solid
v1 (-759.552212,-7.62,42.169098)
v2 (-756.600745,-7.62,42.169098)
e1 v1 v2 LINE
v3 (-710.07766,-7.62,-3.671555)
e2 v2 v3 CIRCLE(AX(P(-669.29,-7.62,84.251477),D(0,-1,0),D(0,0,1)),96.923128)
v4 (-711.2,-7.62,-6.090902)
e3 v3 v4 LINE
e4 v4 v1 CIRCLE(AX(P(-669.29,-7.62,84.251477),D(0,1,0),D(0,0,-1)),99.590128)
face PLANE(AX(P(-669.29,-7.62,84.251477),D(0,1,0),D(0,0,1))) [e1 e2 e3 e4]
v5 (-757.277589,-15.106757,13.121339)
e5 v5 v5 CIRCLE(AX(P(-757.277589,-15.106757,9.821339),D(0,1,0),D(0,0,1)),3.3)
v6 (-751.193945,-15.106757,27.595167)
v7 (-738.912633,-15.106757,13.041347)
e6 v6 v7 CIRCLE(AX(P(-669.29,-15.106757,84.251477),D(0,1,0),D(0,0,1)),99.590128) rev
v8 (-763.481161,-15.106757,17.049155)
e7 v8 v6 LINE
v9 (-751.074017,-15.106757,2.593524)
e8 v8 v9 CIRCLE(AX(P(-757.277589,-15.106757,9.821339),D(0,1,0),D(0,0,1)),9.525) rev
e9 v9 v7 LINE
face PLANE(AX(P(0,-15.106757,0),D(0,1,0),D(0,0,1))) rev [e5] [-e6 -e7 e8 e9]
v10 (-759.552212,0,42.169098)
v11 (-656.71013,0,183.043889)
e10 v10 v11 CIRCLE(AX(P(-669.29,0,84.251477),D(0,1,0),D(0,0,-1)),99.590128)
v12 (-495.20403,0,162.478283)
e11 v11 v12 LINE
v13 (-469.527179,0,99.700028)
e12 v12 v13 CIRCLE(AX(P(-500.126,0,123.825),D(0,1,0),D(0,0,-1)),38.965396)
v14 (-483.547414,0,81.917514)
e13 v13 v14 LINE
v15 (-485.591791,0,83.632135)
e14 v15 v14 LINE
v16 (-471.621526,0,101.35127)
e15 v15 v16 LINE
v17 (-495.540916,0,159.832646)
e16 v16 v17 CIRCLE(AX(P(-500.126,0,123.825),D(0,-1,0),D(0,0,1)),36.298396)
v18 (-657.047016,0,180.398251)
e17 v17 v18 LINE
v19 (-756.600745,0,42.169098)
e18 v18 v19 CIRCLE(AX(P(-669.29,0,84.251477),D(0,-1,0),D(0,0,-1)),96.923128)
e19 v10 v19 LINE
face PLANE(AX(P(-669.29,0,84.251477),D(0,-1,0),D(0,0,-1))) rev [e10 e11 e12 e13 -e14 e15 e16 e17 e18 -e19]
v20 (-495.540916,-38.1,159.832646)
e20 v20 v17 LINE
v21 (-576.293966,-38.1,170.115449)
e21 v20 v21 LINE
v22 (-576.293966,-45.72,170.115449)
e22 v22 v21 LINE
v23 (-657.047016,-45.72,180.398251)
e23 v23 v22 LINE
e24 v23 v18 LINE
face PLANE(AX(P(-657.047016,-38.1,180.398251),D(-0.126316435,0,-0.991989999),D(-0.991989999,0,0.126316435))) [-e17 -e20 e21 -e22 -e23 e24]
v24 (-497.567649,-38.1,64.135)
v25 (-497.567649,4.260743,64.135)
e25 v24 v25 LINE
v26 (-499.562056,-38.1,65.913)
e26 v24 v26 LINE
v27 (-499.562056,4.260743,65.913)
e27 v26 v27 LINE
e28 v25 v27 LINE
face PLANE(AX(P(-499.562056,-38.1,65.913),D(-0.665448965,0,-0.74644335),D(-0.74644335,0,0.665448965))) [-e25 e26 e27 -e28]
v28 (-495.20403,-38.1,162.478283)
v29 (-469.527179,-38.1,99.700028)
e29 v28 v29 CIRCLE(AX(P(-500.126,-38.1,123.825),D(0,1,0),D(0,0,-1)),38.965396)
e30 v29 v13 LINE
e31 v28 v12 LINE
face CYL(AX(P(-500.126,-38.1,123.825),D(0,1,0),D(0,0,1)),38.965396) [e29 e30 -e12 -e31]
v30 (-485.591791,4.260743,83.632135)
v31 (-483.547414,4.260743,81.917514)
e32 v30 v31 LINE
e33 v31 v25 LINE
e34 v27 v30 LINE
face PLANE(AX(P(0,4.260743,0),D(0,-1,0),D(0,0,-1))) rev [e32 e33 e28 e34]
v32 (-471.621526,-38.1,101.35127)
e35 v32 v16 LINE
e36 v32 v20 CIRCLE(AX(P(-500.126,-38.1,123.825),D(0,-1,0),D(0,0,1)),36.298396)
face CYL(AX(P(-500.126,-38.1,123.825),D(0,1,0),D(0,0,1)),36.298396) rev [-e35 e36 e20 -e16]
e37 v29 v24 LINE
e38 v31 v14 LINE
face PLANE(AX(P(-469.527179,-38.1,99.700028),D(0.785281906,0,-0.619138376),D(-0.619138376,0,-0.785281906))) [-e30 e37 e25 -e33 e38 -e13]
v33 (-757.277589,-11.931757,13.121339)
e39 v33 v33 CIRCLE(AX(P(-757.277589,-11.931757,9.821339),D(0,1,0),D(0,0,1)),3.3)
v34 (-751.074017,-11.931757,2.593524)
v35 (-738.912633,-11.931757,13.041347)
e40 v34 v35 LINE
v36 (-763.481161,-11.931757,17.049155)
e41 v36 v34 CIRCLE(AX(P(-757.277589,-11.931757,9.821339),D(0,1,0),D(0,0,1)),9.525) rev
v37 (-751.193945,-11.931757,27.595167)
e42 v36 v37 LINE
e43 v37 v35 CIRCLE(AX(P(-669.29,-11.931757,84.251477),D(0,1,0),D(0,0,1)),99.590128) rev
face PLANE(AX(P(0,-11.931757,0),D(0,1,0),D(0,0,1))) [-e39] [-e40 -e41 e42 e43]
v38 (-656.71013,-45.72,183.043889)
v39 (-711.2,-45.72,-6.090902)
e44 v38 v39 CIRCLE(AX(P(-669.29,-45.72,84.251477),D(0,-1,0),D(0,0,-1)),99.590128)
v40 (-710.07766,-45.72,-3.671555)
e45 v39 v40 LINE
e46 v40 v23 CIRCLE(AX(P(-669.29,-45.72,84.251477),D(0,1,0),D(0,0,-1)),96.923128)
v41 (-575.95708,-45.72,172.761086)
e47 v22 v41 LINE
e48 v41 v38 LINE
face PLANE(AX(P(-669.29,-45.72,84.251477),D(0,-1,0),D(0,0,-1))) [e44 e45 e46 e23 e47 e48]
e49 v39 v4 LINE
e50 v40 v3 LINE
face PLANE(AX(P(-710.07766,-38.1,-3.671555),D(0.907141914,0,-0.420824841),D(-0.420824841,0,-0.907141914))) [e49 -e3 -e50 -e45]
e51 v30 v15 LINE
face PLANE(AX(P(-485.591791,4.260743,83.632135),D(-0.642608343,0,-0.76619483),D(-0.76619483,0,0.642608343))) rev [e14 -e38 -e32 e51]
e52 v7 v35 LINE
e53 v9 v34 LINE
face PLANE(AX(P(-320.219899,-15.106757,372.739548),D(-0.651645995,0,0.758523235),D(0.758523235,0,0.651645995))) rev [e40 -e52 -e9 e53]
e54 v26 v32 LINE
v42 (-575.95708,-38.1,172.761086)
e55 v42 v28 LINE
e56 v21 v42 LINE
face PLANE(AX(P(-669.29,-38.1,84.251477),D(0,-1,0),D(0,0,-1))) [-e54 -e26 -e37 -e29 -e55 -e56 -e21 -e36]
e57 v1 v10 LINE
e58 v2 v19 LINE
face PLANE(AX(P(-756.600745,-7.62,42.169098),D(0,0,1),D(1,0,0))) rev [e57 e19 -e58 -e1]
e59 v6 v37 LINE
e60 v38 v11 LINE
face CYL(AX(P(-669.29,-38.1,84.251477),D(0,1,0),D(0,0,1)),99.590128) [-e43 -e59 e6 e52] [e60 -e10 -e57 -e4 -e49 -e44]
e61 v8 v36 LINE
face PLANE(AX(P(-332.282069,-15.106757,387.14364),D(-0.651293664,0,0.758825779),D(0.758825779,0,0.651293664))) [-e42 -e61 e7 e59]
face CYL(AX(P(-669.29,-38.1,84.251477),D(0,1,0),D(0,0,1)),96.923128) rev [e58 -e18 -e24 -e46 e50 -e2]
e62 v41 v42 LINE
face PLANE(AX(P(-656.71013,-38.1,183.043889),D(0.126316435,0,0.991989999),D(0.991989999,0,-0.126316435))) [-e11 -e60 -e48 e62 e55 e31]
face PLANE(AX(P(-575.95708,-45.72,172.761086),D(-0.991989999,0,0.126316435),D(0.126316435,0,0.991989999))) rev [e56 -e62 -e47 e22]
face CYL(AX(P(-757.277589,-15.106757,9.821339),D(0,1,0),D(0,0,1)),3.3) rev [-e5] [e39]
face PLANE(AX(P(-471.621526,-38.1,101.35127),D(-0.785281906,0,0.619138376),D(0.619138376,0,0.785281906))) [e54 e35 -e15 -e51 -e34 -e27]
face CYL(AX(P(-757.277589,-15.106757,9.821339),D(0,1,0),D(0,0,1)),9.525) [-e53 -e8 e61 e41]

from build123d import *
from build123d.topology import SkipClean

# Parameters (mm, degrees)
BASE_FLANGE1_DEPTH  = 38.1
CUT_EXTRUDE1_DEPTH  = 7.62
SKETCH9_R           = 3.3
BOSS_EXTRUDE1_DEPTH = 3.175
BOSS_EXTRUDE2_DEPTH = 7.62
BOSS_EXTRUDE4_DEPTH = 4.26074332


# Sheet-metal steps are written as plain solids
with BuildPart() as part:
    # Sketch1 → Base-Flange1 (new body)
    with BuildSketch(Plane(origin=(0, 0, 0), x_dir=(1, 0, 0), z_dir=(0, 1, 0))):
        with BuildLine():
            Line((-657.047015903, -180.398251424), (-495.540915967, -159.83264605))
            ThreePointArc((-495.540915967, -159.83264605), (-466.529161595, -137.56639807), (-471.621526187, -101.351269827))
            Line((-471.621526187, -101.351269827), (-499.562056453, -65.912999952))
            Line((-499.562056453, -65.912999952), (-497.56764915, -64.134999952))
            Line((-497.56764915, -64.134999952), (-469.527179345, -99.700027778))
            ThreePointArc((-469.527179345, -99.700027778), (-464.060656724, -138.576037958), (-495.204030033, -162.478283377))
            Line((-495.204030033, -162.478283377), (-656.710129969, -183.043888751))
            ThreePointArc((-656.710129969, -183.043888751), (-764.987734735, -111.822063922), (-711.2, 6.090902363))
            Line((-711.2, 6.090902363), (-710.077660148, 3.671554877))
            ThreePointArc((-710.077660148, 3.671554877), (-762.424972114, -111.083730158), (-657.047015903, -180.398251424))
        make_face()
    extrude(amount=-BASE_FLANGE1_DEPTH)

    # Sketch7 → Cut-Extrude1 (cut)
    with BuildSketch(Plane(origin=(-711.2, 0, -6.090902363), x_dir=(1, 0, 0), z_dir=(0, 1, 0))):
        with BuildLine():
            Line((1.122339852, -2.419347486), (0, 0))
            ThreePointArc((0, 0), (-28.443609249, -19.854342865), (-48.352212426, -48.26))
            Line((-48.352212426, -48.26), (-45.400744677, -48.26))
            ThreePointArc((-45.400744677, -48.26), (-26.116771828, -21.302890058), (1.122339852, -2.419347486))
        make_face()
    extrude(amount=-CUT_EXTRUDE1_DEPTH, mode=Mode.SUBTRACT)

    # Sketch9 → Boss-Extrude1 (add)
    with BuildSketch(Plane(origin=(0, -11.93175668, 0), x_dir=(1, 0, 0), z_dir=(0, 1, 0))):
        with BuildLine():
            ThreePointArc((-751.074016673, -2.593523568), (-764.50540437, -3.617766971), (-763.481160967, -17.049154667))
            Line((-763.481160967, -17.049154667), (-751.193944793, -27.595167013))
            ThreePointArc((-751.193944793, -27.595167013), (-745.401952839, -20.024035331), (-738.912633033, -13.041347154))
            Line((-738.912633033, -13.041347154), (-751.074016673, -2.593523568))
        make_face()
        with Locations(Location((-757.27758882, -9.821339117, 0), (0, 0, 270))):
            Circle(SKETCH9_R, mode=Mode.SUBTRACT)
    extrude(amount=-BOSS_EXTRUDE1_DEPTH)

    # Sketch10 → Boss-Extrude2 (add)
    with SkipClean():  # the faces are left unmerged after this step: merging them gives an invalid solid
        with BuildSketch(Plane.XZ.offset(38.1)):
            with BuildLine():
                Line((-710.077660148, -3.671554877), (-711.2, -6.090902363))
                ThreePointArc((-711.2, -6.090902363), (-764.987734735, 111.822063922), (-656.710129969, 183.043888751))
                Line((-656.710129969, 183.043888751), (-575.957080001, 172.761086064))
                Line((-575.957080001, 172.761086064), (-576.293965935, 170.115448737))
                Line((-576.293965935, 170.115448737), (-657.047015903, 180.398251424))
                ThreePointArc((-657.047015903, 180.398251424), (-762.424972114, 111.083730158), (-710.077660148, -3.671554877))
            make_face()
        extrude(amount=BOSS_EXTRUDE2_DEPTH)

    # Sketch12 → Boss-Extrude4 (add)
    with SkipClean():  # the faces are left unmerged after this step: merging them gives an invalid solid
        with BuildSketch(Plane(origin=(0, 0, 0), x_dir=(1, 0, 0), z_dir=(0, 1, 0))):
            Polygon((-497.56764915, -64.134999952), (-499.562056453, -65.912999952), (-485.59179132, -83.632134889), (-483.547414248, -81.917513865), align=None)
        extrude(amount=BOSS_EXTRUDE4_DEPTH)


solid = part.part
